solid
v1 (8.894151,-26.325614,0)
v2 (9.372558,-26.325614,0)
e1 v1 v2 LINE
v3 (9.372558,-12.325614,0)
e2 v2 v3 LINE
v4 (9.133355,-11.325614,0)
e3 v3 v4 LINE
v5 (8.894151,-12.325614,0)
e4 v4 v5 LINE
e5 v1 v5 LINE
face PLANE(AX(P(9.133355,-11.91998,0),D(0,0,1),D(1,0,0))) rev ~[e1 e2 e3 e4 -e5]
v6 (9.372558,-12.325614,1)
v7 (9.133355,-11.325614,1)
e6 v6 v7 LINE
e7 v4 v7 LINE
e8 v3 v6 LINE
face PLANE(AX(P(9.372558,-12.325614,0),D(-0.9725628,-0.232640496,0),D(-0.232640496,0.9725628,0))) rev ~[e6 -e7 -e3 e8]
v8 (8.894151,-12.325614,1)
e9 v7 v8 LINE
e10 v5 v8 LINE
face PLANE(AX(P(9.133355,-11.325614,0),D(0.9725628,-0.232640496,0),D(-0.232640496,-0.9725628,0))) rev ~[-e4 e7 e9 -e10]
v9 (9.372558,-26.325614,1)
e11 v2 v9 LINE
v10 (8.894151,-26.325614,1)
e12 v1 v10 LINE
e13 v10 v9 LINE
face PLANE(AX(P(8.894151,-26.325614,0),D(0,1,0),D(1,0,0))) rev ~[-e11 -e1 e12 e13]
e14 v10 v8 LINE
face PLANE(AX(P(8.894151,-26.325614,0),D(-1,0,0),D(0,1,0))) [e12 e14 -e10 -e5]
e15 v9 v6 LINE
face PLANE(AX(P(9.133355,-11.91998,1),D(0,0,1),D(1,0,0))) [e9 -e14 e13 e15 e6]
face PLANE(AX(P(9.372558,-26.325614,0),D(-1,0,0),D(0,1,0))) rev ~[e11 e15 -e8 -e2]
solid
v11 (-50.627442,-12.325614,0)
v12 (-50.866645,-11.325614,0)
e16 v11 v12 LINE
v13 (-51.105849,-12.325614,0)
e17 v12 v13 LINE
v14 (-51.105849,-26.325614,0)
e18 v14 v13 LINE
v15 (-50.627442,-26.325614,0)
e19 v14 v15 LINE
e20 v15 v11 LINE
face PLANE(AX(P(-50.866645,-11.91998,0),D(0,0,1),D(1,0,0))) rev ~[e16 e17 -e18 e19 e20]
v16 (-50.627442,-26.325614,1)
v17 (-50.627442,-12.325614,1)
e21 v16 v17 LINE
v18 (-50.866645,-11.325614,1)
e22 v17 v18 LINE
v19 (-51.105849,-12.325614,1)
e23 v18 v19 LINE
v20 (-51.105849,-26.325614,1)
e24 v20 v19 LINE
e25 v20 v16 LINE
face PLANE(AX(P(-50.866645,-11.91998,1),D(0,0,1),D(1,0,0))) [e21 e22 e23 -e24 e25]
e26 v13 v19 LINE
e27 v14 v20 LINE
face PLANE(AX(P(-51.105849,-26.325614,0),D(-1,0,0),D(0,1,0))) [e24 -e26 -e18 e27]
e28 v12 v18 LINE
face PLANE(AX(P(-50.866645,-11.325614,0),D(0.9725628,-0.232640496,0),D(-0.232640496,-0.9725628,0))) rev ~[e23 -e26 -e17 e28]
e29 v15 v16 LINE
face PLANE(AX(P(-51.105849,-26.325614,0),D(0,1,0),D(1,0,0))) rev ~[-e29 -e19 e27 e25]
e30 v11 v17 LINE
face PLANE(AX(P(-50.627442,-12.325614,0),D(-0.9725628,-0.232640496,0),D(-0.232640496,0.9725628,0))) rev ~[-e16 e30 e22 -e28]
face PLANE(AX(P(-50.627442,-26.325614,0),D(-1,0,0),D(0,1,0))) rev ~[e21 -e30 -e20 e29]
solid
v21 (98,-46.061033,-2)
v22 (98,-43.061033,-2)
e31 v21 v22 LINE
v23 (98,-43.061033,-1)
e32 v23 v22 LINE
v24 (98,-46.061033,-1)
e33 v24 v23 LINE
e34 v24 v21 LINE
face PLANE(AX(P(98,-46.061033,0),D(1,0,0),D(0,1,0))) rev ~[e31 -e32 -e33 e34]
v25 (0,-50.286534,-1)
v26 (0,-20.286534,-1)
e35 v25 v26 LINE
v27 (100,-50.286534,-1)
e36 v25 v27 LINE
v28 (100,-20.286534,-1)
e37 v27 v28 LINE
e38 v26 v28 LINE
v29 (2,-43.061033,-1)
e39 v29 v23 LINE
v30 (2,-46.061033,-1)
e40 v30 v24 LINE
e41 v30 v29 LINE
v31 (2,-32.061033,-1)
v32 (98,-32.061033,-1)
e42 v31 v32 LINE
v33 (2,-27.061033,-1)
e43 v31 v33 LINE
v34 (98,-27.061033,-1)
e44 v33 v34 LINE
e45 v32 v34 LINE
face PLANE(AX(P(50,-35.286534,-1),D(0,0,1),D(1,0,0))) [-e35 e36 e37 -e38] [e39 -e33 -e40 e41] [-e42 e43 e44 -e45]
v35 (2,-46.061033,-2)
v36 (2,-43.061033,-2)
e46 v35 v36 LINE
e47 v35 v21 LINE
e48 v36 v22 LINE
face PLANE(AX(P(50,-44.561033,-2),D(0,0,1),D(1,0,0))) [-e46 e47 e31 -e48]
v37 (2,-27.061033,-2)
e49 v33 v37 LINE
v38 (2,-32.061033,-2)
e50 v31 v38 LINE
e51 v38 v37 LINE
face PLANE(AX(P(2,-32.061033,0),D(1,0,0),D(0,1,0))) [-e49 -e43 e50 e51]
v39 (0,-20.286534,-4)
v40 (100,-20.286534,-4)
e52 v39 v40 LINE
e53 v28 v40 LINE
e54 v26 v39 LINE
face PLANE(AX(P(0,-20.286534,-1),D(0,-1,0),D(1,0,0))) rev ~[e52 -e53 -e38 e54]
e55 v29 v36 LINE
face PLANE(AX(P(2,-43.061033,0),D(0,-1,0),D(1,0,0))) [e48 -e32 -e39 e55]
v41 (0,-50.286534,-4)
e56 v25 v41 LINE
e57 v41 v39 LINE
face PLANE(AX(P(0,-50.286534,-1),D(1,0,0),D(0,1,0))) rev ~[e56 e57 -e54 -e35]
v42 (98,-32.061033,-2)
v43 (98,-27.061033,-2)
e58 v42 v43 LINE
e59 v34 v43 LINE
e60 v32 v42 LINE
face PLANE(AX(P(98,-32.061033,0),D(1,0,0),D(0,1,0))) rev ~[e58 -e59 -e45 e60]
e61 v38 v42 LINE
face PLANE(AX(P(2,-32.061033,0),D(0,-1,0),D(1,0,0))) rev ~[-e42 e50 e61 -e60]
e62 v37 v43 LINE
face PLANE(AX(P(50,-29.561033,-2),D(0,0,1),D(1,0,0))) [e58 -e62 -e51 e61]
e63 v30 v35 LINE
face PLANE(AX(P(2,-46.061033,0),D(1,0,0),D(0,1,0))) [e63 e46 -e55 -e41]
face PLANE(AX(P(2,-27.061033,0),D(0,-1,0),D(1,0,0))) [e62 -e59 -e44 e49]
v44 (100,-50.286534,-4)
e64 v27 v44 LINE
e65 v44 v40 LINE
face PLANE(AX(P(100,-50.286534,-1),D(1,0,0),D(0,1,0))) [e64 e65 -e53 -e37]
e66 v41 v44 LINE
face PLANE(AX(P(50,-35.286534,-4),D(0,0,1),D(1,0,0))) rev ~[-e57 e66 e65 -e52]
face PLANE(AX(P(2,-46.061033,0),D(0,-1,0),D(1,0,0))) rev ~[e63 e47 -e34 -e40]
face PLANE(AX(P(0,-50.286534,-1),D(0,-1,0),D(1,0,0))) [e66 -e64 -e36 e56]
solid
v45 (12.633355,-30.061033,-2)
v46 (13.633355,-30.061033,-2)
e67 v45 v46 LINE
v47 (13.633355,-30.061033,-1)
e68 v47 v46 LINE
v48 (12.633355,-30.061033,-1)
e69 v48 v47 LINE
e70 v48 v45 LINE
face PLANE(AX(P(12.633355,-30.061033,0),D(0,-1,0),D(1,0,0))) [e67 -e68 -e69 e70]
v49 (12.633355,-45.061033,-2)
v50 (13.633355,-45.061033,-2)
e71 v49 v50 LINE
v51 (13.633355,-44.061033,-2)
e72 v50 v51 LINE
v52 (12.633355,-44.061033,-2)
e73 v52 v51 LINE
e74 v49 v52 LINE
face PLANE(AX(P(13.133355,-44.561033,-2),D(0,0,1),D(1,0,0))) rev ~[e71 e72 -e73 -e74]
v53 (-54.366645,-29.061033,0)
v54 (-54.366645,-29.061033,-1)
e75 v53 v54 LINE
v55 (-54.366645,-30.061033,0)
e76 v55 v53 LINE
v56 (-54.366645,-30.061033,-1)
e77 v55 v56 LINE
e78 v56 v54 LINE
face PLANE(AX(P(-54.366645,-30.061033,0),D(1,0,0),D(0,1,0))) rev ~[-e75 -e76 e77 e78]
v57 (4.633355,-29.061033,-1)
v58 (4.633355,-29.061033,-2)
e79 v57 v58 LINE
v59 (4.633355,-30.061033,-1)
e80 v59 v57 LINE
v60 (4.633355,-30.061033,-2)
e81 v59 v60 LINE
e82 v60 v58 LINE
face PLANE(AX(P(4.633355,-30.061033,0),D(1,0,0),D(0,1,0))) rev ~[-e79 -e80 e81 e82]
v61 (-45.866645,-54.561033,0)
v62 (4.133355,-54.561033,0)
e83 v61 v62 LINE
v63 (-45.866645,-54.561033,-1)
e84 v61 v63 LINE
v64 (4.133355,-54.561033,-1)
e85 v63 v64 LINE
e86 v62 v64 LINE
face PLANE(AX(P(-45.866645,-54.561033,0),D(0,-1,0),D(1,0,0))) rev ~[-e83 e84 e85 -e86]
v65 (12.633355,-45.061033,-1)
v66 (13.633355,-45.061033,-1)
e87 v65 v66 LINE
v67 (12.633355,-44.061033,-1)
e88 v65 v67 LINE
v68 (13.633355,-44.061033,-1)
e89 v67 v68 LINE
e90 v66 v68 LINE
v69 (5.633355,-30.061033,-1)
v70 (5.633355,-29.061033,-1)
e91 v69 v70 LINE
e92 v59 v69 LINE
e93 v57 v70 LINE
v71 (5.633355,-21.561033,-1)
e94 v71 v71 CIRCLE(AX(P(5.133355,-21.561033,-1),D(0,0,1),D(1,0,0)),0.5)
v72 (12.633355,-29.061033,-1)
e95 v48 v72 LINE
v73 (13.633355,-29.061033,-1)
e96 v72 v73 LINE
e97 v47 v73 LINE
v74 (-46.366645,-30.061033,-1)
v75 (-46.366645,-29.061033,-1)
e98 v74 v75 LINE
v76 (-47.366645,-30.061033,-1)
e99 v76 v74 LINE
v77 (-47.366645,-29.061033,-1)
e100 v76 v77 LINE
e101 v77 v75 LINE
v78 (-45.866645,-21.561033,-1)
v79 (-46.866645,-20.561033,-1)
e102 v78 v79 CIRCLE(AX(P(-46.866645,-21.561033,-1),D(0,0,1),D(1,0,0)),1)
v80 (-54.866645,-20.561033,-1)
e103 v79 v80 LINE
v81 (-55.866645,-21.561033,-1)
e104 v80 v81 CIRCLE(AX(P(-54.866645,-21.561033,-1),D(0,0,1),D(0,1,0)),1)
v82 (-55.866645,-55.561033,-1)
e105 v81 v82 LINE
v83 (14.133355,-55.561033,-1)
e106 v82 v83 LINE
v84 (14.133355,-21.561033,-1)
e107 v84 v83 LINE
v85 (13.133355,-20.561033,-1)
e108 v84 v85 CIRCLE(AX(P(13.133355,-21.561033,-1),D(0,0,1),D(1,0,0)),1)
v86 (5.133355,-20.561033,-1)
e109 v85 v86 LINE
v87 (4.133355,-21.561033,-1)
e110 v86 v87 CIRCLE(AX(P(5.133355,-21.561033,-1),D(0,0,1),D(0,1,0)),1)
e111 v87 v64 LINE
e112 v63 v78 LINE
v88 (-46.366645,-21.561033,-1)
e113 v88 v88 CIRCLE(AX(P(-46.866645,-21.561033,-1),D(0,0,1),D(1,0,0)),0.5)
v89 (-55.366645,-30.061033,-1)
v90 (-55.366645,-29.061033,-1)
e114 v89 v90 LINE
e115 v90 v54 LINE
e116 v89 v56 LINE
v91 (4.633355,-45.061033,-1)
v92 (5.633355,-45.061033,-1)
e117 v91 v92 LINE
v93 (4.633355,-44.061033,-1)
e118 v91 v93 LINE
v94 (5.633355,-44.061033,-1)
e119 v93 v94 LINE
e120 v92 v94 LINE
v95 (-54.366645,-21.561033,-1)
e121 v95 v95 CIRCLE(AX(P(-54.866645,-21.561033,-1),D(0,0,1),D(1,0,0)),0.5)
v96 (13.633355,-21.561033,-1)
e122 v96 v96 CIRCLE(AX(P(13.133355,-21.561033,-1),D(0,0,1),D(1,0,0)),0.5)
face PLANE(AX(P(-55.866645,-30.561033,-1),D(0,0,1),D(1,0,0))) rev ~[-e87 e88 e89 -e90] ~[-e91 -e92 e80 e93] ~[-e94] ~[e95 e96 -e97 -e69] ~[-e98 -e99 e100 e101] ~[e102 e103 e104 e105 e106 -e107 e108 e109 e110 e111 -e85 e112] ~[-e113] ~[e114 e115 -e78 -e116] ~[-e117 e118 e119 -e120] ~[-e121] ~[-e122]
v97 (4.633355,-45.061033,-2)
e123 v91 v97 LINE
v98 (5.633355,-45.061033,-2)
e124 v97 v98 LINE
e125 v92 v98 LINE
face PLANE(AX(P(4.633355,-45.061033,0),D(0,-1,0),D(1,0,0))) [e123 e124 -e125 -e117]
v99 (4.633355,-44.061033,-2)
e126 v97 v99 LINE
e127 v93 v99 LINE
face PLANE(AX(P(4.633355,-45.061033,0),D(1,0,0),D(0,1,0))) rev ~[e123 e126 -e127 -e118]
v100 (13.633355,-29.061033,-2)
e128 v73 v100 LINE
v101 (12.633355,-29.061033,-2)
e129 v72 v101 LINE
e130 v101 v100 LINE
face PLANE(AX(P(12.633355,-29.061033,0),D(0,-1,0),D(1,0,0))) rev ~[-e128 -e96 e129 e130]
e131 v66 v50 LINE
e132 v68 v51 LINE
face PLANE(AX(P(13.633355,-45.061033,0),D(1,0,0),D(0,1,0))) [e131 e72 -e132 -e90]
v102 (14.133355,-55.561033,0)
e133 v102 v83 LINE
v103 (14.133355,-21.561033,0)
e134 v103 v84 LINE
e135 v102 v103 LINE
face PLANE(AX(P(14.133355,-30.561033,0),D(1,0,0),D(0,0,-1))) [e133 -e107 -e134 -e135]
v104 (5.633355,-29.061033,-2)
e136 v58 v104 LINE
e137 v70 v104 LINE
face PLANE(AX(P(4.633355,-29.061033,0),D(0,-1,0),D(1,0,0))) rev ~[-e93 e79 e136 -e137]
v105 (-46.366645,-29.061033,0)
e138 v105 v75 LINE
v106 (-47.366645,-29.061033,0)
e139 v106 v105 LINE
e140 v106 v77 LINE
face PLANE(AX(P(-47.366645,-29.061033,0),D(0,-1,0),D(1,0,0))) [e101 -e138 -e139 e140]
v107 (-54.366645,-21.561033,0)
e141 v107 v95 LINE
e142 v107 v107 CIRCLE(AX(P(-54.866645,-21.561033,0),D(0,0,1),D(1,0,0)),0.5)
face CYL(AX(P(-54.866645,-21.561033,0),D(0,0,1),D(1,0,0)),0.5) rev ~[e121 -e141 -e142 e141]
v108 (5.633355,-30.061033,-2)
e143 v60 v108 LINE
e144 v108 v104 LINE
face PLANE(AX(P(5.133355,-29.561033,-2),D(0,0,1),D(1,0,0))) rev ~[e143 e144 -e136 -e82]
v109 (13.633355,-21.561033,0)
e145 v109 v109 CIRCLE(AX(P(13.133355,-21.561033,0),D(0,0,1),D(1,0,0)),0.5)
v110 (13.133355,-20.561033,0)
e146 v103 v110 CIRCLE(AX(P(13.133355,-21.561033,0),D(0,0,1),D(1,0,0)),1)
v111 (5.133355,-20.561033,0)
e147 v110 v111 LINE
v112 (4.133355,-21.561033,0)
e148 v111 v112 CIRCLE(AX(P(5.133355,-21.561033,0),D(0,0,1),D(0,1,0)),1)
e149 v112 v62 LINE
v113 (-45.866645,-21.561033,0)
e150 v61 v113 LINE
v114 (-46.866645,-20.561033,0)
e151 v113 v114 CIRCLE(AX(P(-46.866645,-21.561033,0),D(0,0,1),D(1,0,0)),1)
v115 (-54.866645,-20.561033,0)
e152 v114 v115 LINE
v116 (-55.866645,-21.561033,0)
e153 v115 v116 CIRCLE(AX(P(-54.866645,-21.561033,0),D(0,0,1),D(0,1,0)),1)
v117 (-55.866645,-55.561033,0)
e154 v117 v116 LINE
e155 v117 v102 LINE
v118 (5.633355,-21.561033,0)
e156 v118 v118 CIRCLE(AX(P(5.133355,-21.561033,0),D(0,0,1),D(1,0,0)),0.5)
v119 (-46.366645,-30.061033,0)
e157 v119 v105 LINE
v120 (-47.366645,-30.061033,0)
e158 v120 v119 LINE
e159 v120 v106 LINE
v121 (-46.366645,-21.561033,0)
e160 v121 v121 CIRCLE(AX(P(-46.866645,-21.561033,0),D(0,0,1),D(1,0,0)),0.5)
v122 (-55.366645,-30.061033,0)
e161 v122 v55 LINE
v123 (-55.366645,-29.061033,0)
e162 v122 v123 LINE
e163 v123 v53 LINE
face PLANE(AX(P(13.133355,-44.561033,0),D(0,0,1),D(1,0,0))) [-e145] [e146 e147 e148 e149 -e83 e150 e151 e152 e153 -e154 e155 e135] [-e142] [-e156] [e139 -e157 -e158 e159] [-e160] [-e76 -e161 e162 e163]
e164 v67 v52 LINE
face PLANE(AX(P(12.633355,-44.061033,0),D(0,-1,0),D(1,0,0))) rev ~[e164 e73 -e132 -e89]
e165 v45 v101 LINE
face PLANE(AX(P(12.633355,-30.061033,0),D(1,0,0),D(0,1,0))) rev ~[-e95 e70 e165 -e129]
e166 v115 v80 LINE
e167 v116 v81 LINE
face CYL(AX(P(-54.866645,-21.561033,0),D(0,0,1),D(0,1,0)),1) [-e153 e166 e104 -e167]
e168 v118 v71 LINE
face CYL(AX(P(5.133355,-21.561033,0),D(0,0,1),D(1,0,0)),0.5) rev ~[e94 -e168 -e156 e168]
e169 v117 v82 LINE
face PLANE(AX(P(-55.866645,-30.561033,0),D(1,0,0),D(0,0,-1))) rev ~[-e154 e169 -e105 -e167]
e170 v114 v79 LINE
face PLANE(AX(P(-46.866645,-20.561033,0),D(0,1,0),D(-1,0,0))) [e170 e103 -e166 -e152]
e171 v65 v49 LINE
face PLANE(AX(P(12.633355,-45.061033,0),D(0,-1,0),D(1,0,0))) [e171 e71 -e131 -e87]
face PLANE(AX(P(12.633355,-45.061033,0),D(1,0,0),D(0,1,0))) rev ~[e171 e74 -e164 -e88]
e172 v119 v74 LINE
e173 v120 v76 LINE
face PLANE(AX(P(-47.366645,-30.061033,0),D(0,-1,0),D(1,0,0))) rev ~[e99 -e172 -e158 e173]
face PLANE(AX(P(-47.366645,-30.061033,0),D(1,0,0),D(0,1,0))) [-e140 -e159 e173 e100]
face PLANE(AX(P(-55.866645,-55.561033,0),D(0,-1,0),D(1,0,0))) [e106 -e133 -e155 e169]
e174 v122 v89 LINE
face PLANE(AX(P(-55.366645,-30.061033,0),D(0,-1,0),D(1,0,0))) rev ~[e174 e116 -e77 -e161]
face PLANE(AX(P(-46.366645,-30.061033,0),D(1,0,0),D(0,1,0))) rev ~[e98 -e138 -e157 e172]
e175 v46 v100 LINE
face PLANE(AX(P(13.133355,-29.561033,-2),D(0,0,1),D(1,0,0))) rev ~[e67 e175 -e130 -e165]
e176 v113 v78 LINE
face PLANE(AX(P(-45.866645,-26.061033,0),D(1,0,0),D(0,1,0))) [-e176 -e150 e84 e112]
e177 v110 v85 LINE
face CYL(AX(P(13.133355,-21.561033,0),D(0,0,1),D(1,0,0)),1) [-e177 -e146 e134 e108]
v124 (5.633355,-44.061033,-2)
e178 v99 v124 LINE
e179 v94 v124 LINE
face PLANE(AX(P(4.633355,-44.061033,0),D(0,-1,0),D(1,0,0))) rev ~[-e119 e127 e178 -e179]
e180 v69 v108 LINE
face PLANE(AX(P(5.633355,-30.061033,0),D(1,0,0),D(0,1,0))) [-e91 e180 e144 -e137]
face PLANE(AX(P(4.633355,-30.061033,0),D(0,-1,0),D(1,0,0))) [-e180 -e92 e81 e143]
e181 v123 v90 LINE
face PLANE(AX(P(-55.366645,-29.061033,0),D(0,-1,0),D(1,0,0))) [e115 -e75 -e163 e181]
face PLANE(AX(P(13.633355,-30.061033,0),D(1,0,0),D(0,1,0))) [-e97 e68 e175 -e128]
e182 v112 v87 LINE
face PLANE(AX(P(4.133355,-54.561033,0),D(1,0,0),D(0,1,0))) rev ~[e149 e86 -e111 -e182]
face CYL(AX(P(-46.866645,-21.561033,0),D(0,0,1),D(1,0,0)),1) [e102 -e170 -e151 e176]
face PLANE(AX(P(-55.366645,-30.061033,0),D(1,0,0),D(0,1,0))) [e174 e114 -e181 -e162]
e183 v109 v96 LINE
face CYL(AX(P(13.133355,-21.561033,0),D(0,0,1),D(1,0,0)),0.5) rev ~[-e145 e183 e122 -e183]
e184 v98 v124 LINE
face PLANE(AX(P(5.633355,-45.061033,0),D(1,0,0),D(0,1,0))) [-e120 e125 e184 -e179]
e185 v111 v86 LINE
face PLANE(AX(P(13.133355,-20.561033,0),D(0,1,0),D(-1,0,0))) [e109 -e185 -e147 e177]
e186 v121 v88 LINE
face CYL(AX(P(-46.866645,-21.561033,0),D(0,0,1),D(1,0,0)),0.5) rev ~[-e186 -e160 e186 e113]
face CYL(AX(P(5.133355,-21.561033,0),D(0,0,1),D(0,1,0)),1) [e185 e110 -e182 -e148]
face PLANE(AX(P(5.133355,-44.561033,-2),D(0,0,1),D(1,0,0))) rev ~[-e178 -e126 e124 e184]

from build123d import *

# Parameters (mm, degrees)
F0_W      = 1
F0_H      = 1
F0_R      = 0.5
F0_W_2    = 50
F0_H_2    = 4.5
F1_DEPTH  = 1
F2_W      = 0.4784071445
F2_H      = 14
F3_DEPTH  = 1
F5_START  = -1
F4_W      = 100
F4_H      = 30
F4_W_2    = 96
F4_H_2    = 3
F4_H_3    = 5
F5_DEPTH  = 3
F6_DEPTH  = 25
F7_DEPTH  = 2
F8_DEPTH  = 2
F9_W      = 50
F9_H      = 28.5
F10_DEPTH = 25


with BuildPart() as f1:
    # F0 (on Top) → F1 (new body)
    with BuildSketch(Plane.XY):
        with BuildLine():
            Line((4.1333548725, -26.0610329807), (4.1333548725, -30.5610329807))
            Line((4.1333548725, -30.5610329807), (14.1333548725, -30.5610329807))
            Line((14.1333548725, -30.5610329807), (14.1333548725, -21.5610329807))
            ThreePointArc((14.1333548725, -21.5610329807), (13.8404616537, -20.8539261995), (13.1333548725, -20.5610329807))
            Line((13.1333548725, -20.5610329807), (5.1333548725, -20.5610329807))
            ThreePointArc((5.1333548725, -20.5610329807), (4.4262480913, -20.8539261995), (4.1333548725, -21.5610329807))
            Line((4.1333548725, -21.5610329807), (4.1333548725, -26.0610329807))
        make_face()
        with Locations((5.1333548725, -29.5610329807)):
            Rectangle(F0_W, F0_H, mode=Mode.SUBTRACT)
        with Locations((13.1333548725, -29.5610329807)):
            Rectangle(F0_W, F0_H, mode=Mode.SUBTRACT)
        with Locations((5.1333548725, -21.5610329807)):
            Circle(F0_R, mode=Mode.SUBTRACT)
        with Locations((13.1333548725, -21.5610329807)):
            Circle(F0_R, mode=Mode.SUBTRACT)
        with BuildLine():
            Line((-55.8666451275, -30.5610329807), (-45.8666451275, -30.5610329807))
            Line((-45.8666451275, -30.5610329807), (-45.8666451275, -26.0610329807))
            Line((-45.8666451275, -26.0610329807), (-45.8666451275, -21.5610329807))
            ThreePointArc((-45.8666451275, -21.5610329807), (-46.1595383463, -20.8539261995), (-46.8666451275, -20.5610329807))
            Line((-46.8666451275, -20.5610329807), (-54.8666451275, -20.5610329807))
            ThreePointArc((-54.8666451275, -20.5610329807), (-55.5737519087, -20.8539261995), (-55.8666451275, -21.5610329807))
            Line((-55.8666451275, -21.5610329807), (-55.8666451275, -30.5610329807))
        make_face()
        with Locations((-54.8666451275, -29.5610329807)):
            Rectangle(F0_W, F0_H, mode=Mode.SUBTRACT)
        with Locations((-46.8666451275, -29.5610329807)):
            Rectangle(F0_W, F0_H, mode=Mode.SUBTRACT)
        with Locations((-54.8666451275, -21.5610329807)):
            Circle(F0_R, mode=Mode.SUBTRACT)
        with Locations((-46.8666451275, -21.5610329807)):
            Circle(F0_R, mode=Mode.SUBTRACT)
        with Locations((-20.8666451275, -28.3110329807)):
            Rectangle(F0_W_2, F0_H_2)
    extrude(amount=-F1_DEPTH)

    # F6 (add): a face of the model
    f6_faces = [f1.faces().sort_by_distance(p)[0] for p in [
        (-20.8666451275, -30.5610329807, -0.5),
    ]]
    extrude(f6_faces, amount=F6_DEPTH)

    # F0 (on Top) → F8 (join, through all)
    with BuildSketch(Plane.XY):
        with Locations((13.1333548725, -44.5610329807)):
            Rectangle(F0_W, F0_H)
        with Locations((5.1333548725, -44.5610329807)):
            Rectangle(F0_W, F0_H)
        with Locations((5.1333548725, -29.5610329807)):
            Rectangle(F0_W, F0_H)
        with Locations((13.1333548725, -29.5610329807)):
            Rectangle(F0_W, F0_H)
    extrude(amount=-F8_DEPTH)

    # F9 (on face) → F10 (cut)
    with BuildSketch(Plane.XY):
        with Locations((-20.8666451275, -40.3110329807)):
            Rectangle(F9_W, F9_H)
    extrude(amount=-F10_DEPTH, mode=Mode.SUBTRACT)


with BuildPart() as f3:
    # F2 (on face) → F3 (new body)
    with BuildSketch(Plane.XY):
        Polygon((9.3725584447, -12.3256136095), (9.1333548725, -11.3256136095), (8.8941513002, -12.3256136095), align=None)
        with Locations((9.1333548725, -19.3256136095)):
            Rectangle(F2_W, F2_H)
    extrude(amount=F3_DEPTH)


with BuildPart() as f3b:
    # F2 (on face) → F3, piece 2 (new body)
    with BuildSketch(Plane.XY):
        Polygon((-51.1058486998, -12.3256136095), (-50.6274415553, -12.3256136095), (-50.8666451275, -11.3256136095), align=None)
        with Locations((-50.8666451275, -19.3256136095)):
            Rectangle(F2_W, F2_H)
    extrude(amount=F3_DEPTH)


with BuildPart() as f5:
    # F4 (on Top) → F5 (new body)
    with BuildSketch(Plane.XY.offset(F5_START)):
        with Locations((50, -35.2865339816)):
            Rectangle(F4_W, F4_H)
        with Locations((50, -44.5610329807)):
            Rectangle(F4_W_2, F4_H_2, mode=Mode.SUBTRACT)
        with Locations((50, -29.5610329807)):
            Rectangle(F4_W_2, F4_H_3, mode=Mode.SUBTRACT)
        with Locations((50, -44.5610329807)):
            Rectangle(F4_W_2, F4_H_2)
        with Locations((50, -29.5610329807)):
            Rectangle(F4_W_2, F4_H_3)
    extrude(amount=-F5_DEPTH)

    # F4 (on Top) → F7 (cut)
    with BuildSketch(Plane.XY):
        with Locations((50, -29.5610329807)):
            Rectangle(F4_W_2, F4_H_3)
        with Locations((50, -44.5610329807)):
            Rectangle(F4_W_2, F4_H_2)
    extrude(amount=-F7_DEPTH, mode=Mode.SUBTRACT)


solid = Compound([f1.part, f3.part, f3b.part, f5.part])
